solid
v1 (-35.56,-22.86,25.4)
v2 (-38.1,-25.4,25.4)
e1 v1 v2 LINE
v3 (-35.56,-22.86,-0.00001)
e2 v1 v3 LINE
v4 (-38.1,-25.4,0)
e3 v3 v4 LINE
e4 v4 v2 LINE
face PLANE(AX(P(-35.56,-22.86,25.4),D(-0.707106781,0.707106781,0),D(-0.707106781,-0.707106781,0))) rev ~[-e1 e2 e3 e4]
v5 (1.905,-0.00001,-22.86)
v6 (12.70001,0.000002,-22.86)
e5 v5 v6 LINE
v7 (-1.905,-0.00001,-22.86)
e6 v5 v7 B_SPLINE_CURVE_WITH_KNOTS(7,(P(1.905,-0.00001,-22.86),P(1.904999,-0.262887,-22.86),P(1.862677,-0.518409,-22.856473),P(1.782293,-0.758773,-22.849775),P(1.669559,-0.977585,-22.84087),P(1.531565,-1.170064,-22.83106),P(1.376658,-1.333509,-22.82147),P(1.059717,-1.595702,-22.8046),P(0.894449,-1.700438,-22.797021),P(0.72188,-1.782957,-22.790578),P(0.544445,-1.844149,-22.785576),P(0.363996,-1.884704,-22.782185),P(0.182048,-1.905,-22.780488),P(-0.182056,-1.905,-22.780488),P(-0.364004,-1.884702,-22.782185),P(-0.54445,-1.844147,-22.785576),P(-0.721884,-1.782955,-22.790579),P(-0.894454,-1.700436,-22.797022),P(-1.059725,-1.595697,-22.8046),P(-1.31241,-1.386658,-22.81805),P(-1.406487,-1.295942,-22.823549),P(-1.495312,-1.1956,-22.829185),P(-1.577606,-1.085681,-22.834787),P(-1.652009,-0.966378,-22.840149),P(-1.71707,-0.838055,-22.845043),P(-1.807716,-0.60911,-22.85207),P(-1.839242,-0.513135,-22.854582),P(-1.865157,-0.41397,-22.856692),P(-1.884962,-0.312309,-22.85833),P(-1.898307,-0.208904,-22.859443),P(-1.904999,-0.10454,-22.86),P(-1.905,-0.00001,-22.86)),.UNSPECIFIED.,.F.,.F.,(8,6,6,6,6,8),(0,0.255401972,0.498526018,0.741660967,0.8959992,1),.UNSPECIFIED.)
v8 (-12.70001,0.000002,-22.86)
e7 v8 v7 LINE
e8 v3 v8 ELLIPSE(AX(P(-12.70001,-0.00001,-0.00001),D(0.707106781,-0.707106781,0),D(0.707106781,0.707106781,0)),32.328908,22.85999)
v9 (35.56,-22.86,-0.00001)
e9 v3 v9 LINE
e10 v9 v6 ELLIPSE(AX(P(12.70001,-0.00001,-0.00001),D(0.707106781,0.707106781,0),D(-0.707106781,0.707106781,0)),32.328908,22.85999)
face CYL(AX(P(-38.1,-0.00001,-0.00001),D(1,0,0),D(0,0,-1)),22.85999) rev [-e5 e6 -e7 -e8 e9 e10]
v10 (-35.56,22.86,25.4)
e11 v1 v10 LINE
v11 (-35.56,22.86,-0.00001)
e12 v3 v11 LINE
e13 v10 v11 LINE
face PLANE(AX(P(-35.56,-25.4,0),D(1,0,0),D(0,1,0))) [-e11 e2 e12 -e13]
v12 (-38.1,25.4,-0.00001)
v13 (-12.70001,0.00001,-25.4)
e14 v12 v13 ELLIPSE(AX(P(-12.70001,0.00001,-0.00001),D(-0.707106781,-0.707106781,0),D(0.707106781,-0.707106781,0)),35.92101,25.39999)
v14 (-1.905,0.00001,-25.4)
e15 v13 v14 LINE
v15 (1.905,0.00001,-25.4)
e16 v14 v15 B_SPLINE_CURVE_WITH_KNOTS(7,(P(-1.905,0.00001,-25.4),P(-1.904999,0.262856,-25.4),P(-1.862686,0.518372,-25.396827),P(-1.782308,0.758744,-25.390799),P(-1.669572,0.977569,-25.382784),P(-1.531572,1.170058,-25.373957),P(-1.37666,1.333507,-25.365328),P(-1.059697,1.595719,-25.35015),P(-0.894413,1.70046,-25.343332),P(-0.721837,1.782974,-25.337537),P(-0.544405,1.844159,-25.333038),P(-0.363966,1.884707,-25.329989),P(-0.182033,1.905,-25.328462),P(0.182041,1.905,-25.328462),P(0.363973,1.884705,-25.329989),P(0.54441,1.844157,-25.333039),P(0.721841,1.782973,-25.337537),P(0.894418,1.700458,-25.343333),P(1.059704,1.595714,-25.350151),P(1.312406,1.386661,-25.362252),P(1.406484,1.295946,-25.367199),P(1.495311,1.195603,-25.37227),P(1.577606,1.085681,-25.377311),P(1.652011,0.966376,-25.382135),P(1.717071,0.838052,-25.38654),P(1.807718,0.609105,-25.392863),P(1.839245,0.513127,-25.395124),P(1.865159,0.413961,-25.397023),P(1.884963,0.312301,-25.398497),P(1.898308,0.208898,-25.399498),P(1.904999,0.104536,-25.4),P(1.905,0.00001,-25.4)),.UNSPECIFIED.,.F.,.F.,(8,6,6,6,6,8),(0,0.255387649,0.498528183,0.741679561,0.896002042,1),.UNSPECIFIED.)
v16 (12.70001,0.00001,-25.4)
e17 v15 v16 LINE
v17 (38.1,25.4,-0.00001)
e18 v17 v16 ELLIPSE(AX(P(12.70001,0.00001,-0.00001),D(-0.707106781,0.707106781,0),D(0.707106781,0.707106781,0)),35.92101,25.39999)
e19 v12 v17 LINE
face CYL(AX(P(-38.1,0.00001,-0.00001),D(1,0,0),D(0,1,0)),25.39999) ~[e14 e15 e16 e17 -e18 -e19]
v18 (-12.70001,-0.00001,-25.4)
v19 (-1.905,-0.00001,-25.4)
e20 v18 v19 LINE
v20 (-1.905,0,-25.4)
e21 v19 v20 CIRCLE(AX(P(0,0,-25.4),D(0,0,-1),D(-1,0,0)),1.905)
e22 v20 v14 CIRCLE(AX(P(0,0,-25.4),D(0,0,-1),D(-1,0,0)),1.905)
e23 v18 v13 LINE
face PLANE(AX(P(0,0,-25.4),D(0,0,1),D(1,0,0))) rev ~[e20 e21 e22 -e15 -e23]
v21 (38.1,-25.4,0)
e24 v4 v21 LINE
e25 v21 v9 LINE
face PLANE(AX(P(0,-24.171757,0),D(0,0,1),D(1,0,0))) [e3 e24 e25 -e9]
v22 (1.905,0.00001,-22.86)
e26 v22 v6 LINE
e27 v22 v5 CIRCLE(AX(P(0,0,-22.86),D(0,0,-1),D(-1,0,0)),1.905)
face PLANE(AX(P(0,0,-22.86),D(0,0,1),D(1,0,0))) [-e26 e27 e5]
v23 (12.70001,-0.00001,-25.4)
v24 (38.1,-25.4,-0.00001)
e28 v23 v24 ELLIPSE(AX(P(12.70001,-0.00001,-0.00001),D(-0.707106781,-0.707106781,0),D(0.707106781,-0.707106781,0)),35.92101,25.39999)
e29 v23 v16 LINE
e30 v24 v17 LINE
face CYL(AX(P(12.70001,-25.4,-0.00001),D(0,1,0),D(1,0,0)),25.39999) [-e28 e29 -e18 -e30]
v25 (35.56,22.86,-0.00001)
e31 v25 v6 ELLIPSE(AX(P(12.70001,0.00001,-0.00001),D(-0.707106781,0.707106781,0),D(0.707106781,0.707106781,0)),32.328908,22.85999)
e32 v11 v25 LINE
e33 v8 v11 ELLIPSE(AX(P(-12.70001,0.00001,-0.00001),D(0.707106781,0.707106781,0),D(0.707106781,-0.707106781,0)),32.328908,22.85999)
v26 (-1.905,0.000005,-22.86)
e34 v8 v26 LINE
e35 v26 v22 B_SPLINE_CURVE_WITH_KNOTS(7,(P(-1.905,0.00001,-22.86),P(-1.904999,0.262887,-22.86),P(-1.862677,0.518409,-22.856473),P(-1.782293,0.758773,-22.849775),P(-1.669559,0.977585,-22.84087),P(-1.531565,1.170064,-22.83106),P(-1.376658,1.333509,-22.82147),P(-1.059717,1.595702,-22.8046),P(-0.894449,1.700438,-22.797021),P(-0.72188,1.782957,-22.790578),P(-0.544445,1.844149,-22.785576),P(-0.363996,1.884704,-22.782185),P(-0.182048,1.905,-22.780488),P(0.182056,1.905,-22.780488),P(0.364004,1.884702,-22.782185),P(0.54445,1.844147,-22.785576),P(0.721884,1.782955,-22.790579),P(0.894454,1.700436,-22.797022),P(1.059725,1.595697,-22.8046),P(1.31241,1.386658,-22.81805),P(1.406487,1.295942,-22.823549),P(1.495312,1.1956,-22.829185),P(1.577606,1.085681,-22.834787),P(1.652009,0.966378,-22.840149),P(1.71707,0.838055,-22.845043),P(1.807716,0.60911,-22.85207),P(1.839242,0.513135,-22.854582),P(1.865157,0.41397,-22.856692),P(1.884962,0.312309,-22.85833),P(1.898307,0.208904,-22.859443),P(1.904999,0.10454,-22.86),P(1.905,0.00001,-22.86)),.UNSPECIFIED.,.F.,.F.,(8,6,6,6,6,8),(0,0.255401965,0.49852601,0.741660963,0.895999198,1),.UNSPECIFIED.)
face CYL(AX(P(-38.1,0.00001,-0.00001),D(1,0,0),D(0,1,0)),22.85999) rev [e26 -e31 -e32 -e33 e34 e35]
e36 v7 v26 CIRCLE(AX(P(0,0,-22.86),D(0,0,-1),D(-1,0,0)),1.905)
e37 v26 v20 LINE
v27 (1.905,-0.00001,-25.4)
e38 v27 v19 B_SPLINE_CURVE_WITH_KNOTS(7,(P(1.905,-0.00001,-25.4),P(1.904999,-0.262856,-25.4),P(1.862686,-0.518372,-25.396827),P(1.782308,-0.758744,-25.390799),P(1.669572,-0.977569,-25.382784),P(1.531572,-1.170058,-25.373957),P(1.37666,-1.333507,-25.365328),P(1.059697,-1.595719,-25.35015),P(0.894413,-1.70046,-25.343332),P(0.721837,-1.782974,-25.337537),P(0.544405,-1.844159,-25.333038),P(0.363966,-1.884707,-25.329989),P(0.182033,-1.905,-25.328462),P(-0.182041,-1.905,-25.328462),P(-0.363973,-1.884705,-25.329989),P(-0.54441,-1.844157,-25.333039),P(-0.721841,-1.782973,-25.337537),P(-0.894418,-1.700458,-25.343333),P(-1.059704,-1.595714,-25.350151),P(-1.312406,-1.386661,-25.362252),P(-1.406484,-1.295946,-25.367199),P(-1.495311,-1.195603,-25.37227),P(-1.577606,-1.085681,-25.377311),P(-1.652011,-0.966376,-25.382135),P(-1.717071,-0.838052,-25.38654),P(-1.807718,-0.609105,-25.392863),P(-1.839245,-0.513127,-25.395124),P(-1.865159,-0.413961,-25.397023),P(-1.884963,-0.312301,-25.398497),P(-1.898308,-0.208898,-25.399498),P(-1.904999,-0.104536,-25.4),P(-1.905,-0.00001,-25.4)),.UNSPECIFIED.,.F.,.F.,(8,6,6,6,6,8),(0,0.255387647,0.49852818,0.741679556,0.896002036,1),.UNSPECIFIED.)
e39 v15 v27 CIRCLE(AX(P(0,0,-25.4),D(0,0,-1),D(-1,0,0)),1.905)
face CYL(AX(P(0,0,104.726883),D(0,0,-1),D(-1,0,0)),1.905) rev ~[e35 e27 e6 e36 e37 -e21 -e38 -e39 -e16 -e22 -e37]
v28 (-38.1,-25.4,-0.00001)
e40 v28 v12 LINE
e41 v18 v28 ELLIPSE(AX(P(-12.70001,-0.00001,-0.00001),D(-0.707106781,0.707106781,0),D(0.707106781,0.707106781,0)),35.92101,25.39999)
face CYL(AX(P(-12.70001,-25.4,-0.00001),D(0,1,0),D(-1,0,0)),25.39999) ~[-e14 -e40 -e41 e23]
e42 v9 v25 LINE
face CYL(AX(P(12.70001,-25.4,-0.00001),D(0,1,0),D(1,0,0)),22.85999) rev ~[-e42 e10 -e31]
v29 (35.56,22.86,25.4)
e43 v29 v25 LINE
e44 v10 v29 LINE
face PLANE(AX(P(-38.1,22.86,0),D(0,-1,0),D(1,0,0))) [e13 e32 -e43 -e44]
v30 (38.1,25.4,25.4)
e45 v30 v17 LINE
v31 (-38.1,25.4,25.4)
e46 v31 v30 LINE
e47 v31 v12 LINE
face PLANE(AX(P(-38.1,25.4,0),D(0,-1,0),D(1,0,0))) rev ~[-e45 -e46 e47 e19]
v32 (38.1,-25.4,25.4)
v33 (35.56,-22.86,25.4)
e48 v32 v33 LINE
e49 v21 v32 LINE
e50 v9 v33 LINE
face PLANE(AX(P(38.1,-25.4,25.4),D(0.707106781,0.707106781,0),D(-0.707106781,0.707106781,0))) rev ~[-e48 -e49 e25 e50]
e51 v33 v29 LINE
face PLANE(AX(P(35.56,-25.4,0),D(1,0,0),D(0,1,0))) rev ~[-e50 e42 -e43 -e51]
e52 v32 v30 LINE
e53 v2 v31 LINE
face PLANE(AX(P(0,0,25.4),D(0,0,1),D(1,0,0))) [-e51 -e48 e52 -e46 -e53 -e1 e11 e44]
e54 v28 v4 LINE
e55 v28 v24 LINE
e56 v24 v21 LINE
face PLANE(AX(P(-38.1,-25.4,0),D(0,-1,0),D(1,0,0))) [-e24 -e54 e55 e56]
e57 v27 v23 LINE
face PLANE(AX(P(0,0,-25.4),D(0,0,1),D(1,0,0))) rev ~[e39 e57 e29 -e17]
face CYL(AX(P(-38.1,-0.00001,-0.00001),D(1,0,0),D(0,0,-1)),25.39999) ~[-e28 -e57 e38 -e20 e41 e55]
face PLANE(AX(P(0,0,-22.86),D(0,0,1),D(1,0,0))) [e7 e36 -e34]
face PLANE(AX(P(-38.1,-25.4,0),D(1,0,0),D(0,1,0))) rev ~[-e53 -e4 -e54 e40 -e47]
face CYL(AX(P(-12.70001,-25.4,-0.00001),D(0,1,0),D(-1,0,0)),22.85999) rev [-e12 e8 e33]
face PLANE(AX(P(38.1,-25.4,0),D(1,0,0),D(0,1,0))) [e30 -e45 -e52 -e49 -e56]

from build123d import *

# Parameters (mm, degrees)
F0_W     = 76.2
F0_H     = 50.8
F1_DEPTH = 25.4
F2_DEPTH = 25.4
F3_R     = 25.39999
F4_T     = -2.54
F6_D     = 3.81
F8_DEPTH = 25.4


# Not quite as in the source:
# - a fillet or chamfer is up to 0.001 mm smaller than in the source, because OpenCascade refuses the exact size


with BuildPart() as f1:
    # F0 (on Top) → F1 (new body)
    with BuildSketch(Plane.XY):
        Rectangle(F0_W, F0_H)
    extrude(amount=F1_DEPTH)

    # F2 (add): a face of the model
    f2_faces = [f1.faces().sort_by_distance(p)[0] for p in [
        (0, 0, 0),
    ]]
    extrude(f2_faces, amount=F2_DEPTH)

    # F3 (radius 25.4 in the source; OpenCascade refuses exactly that, so slightly less here)
    f3_edges = [f1.edges().sort_by_distance(p)[0] for p in [
        (0, -25.4, -25.4),
        (38.1, 0, -25.4),
        (0, 25.4, -25.4),
        (-38.1, 0, -25.4),
    ]]
    fillet(f3_edges, radius=F3_R)

    # F4
    f4_openings = [f1.faces().sort_by_distance(p)[0] for p in [
        (0, 0, 25.4),
    ]]
    offset(amount=F4_T, openings=f4_openings)

    # F6 (through all)
    with Locations(Plane.XY):
        with Locations((0, 0)):
            Hole(F6_D / 2)

    # F7 (on face) → F8 (cut)
    with BuildSketch(Plane.XY.offset(25.4)):
        Polygon((-35.56, -22.86), (-38.1, -25.4), (38.1, -25.4), (35.56, -22.86), align=None)
    extrude(amount=-F8_DEPTH, mode=Mode.SUBTRACT)


solid = f1.part
